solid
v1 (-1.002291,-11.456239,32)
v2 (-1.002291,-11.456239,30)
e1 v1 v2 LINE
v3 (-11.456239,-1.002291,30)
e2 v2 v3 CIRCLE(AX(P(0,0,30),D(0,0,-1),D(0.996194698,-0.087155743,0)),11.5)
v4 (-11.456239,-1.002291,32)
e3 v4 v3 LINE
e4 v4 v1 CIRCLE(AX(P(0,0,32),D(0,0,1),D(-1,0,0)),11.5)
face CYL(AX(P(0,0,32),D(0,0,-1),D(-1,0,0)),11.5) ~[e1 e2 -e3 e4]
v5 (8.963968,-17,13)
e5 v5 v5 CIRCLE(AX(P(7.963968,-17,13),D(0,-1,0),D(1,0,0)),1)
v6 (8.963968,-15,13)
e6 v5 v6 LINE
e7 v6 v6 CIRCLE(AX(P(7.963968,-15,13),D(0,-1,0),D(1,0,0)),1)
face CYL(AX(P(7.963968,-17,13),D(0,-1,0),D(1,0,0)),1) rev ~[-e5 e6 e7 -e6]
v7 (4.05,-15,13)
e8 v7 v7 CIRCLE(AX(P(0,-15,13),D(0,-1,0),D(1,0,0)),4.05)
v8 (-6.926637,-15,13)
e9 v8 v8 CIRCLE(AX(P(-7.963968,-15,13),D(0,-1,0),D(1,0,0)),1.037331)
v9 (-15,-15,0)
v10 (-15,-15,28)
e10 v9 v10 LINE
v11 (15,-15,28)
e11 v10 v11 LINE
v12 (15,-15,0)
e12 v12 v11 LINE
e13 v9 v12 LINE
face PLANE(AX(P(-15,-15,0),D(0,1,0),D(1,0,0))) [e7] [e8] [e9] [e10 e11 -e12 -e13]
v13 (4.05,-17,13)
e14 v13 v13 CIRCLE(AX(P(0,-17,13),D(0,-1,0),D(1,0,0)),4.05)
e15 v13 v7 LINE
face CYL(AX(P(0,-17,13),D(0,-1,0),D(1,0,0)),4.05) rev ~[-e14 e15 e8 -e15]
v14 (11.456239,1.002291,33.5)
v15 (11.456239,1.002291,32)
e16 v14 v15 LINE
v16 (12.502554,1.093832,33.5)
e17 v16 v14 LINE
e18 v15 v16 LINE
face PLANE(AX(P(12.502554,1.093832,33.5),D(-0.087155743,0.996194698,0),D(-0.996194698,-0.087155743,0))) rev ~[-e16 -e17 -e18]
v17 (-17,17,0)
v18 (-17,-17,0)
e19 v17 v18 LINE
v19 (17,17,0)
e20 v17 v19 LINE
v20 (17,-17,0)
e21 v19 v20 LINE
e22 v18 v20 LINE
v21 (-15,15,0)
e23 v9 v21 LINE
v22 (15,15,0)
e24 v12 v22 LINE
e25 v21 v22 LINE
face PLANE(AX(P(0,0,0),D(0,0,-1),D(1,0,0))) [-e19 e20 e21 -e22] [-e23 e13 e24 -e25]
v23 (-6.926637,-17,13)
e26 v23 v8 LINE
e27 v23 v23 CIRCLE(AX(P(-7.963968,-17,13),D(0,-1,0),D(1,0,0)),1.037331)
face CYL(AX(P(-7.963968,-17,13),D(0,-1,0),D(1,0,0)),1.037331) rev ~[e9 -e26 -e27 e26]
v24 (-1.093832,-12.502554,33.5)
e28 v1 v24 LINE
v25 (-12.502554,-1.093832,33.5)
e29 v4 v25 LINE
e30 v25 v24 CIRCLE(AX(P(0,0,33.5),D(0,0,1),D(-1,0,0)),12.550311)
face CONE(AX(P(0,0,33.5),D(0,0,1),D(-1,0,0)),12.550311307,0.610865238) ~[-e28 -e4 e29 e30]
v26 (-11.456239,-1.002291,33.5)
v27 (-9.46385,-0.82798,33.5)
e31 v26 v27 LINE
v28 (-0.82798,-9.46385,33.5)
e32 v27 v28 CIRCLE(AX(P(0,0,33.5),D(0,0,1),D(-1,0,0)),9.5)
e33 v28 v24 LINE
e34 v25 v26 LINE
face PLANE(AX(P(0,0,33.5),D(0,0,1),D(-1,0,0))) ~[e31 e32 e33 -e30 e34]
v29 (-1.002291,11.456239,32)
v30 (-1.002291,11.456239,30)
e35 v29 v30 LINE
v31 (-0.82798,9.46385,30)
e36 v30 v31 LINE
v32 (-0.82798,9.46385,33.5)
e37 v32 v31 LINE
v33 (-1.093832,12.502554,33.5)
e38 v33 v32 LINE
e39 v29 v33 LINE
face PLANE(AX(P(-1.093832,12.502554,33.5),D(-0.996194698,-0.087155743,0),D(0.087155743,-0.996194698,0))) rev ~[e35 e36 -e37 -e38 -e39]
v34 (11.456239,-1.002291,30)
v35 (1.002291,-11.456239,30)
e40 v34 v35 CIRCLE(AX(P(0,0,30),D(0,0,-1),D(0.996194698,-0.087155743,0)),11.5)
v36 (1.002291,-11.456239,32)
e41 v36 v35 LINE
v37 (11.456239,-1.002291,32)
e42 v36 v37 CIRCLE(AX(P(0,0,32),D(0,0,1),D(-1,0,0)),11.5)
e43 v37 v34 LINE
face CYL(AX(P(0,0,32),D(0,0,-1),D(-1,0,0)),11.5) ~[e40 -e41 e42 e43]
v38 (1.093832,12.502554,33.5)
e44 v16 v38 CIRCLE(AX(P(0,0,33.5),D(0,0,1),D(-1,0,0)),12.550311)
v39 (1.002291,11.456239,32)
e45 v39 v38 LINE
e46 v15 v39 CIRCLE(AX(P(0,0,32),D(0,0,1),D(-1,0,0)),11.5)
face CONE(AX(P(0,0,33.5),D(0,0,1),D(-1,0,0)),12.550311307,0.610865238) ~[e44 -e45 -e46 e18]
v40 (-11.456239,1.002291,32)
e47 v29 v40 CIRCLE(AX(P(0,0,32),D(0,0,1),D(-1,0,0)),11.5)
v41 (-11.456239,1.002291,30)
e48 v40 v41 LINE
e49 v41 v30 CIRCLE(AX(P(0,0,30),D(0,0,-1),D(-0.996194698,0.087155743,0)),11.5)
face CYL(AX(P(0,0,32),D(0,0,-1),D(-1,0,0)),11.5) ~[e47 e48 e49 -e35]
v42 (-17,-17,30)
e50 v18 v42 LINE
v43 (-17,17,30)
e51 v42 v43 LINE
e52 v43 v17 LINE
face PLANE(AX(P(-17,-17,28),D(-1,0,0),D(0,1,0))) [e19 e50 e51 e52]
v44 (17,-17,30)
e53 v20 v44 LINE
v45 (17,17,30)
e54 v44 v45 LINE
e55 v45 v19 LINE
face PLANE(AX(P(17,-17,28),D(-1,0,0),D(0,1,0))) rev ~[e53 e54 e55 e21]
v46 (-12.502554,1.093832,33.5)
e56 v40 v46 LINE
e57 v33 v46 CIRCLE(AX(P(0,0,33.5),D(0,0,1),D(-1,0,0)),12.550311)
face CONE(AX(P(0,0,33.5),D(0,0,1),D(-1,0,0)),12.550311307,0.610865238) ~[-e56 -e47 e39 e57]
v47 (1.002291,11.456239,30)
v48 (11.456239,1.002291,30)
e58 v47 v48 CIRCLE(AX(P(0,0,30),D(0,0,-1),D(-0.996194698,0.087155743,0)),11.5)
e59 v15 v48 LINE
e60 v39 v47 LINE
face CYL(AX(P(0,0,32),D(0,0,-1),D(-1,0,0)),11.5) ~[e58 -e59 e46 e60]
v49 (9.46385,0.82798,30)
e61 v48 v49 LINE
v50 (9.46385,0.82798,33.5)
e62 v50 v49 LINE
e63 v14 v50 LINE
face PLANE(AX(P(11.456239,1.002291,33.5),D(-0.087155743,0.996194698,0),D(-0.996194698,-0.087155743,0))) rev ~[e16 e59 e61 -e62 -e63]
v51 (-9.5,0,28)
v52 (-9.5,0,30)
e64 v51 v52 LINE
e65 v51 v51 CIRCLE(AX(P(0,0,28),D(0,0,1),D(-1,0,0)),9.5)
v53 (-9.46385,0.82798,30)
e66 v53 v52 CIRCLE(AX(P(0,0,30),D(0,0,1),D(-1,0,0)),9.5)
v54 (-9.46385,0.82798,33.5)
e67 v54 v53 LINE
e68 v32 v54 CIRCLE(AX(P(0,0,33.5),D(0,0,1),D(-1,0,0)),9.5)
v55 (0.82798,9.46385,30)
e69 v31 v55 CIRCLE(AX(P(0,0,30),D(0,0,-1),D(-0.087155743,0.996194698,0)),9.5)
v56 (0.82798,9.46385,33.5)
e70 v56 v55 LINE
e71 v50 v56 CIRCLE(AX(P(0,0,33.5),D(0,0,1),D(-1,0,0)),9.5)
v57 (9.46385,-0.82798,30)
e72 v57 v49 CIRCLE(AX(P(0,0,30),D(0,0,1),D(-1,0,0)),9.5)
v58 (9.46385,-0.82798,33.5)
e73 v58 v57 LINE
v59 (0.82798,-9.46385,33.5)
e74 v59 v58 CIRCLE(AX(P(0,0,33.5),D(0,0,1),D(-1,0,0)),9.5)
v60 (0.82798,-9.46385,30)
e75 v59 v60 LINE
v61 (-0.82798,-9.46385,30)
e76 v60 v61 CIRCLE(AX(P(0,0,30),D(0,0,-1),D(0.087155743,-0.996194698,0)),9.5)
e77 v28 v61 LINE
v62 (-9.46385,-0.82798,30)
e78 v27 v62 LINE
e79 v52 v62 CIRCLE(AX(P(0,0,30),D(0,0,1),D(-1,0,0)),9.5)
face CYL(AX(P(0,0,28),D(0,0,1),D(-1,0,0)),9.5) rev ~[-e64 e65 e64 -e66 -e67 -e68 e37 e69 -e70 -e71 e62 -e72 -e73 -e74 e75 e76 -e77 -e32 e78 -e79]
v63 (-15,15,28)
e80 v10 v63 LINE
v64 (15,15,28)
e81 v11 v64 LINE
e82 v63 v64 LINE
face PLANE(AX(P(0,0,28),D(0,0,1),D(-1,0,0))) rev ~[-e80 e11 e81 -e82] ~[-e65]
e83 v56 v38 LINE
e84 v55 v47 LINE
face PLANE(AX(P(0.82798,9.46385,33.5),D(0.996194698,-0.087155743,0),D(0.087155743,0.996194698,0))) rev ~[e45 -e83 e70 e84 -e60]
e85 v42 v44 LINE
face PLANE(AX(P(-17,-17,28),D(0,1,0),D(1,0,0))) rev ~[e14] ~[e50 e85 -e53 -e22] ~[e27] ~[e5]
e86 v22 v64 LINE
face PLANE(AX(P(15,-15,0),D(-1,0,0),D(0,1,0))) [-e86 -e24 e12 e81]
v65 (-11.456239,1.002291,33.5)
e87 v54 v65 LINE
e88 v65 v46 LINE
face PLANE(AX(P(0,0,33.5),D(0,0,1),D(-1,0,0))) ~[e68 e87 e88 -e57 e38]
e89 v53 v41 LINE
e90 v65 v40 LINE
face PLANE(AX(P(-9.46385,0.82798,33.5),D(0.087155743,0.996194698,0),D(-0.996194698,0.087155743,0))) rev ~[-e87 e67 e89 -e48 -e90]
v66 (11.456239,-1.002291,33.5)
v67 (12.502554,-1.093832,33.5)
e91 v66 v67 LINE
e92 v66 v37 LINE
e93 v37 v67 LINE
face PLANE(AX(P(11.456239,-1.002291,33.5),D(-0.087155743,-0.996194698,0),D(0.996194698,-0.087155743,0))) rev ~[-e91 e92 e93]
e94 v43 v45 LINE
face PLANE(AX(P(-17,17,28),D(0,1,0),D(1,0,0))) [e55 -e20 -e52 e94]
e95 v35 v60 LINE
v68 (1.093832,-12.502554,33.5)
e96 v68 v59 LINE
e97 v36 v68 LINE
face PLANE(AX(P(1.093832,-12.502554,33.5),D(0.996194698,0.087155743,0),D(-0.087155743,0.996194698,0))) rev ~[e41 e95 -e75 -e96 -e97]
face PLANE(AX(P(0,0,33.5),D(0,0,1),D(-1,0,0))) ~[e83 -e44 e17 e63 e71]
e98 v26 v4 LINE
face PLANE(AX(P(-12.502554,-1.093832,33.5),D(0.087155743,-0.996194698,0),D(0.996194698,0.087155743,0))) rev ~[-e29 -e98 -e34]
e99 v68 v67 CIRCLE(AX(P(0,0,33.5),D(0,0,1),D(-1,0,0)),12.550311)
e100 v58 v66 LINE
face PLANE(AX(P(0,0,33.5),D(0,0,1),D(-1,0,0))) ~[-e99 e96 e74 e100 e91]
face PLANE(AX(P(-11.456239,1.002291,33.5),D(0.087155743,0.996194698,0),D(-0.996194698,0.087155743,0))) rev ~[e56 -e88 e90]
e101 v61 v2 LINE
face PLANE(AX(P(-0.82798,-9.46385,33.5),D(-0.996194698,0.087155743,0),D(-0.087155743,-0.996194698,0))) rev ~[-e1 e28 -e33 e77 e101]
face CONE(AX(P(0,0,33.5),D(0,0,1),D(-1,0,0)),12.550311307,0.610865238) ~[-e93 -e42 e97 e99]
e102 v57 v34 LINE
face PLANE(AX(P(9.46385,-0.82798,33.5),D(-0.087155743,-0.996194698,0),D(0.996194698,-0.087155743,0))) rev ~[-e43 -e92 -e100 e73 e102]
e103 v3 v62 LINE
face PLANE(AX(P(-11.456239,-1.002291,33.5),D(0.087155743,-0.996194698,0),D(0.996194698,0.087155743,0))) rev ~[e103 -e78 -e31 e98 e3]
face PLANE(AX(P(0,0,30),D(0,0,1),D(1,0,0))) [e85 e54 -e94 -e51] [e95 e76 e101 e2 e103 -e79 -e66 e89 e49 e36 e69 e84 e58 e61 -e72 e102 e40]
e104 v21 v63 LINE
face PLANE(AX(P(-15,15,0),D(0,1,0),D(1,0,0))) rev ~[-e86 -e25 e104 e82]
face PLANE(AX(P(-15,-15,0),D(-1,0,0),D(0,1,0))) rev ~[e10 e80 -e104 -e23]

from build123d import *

# Parameters (mm, degrees)
F0_W      = 34
F0_H      = 34
F0_W_2    = 30
F0_H_2    = 30
F1_DEPTH  = 2
F2_DEPTH  = 28
F4_W      = 34
F4_H      = 34
F4_W_2    = 30
F4_H_2    = 30
F5_DEPTH  = 2
F9_DEPTH  = 3.5
F3_R      = 4.05
F3_R_2    = 1
F3_R_3    = 1.0373308001
F10_DEPTH = 2
F11_W     = 34
F11_H     = 34
F12_DEPTH = 2


with BuildPart() as f1:
    # F0 (on Top) → F1 (new body)
    with BuildSketch(Plane.XY):
        Rectangle(F0_W, F0_H)
        Rectangle(F0_W_2, F0_H_2, mode=Mode.SUBTRACT)
        Rectangle(F0_W_2, F0_H_2)
    extrude(amount=-F1_DEPTH)

    # F0 (on Top) → F2 (join)
    with BuildSketch(Plane.XY):
        Rectangle(F0_W, F0_H)
        Rectangle(F0_W_2, F0_H_2, mode=Mode.SUBTRACT)
    extrude(amount=F2_DEPTH)

    # F4 (on face) → F5 (join)
    with BuildSketch(Plane.XY.offset(28)):
        Rectangle(F4_W, F4_H)
        Rectangle(F4_W_2, F4_H_2, mode=Mode.SUBTRACT)
        Rectangle(F4_W_2, F4_H_2)
        with BuildLine():
            ThreePointArc((11.4562390281, 1.0022910416), (11.4890545482, 0.5016229547), (11.5, 0))
            ThreePointArc((11.5, 0), (11.4890545482, -0.5016229547), (11.4562390281, -1.0022910416))
            ThreePointArc((11.4562390281, -1.0022910416), (0, -11.5), (-11.4562390281, -1.0022910416))
            ThreePointArc((-11.4562390281, -1.0022910416), (-11.5, 0), (-11.4562390281, 1.0022910416))
            ThreePointArc((-11.4562390281, 1.0022910416), (0, 11.5), (11.4562390281, 1.0022910416))
        make_face(mode=Mode.SUBTRACT)
    extrude(amount=F5_DEPTH)

    # F6 (on Front) → F7 (revolve)
    with BuildSketch(Plane.XZ):
        Polygon((-11.5, 32), (-11.5, 30), (-9.5, 30), (-9.5, 33.5), (-12.5503113073, 33.5), align=None)
        Polygon((-9.5, 30), (-11.5, 30), (-11.5, 28), (-10.5, 28), (-9.5, 28), align=None)
    revolve(axis=Axis((0, 0, 27.9606003314), (0, 0, 1)))

    # F8 (on face) → F9 (cut)
    with BuildSketch(Plane.XY.offset(33.5)):
        with BuildLine():
            Line((9.4638496319, 0.8279795561), (0, 0))
            Line((0, 0), (9.4638496319, -0.8279795561))
            ThreePointArc((9.4638496319, -0.8279795561), (9.490958105, -0.41438418), (9.5, 0))
            ThreePointArc((9.5, 0), (9.490958105, 0.41438418), (9.4638496319, 0.8279795561))
        make_face()
        with BuildLine():
            Line((-9.4638496319, -0.8279795561), (0, 0))
            Line((0, 0), (-9.4638496319, 0.8279795561))
            ThreePointArc((-9.4638496319, 0.8279795561), (-9.5, 0), (-9.4638496319, -0.8279795561))
        make_face()
        with BuildLine():
            ThreePointArc((9.5, 0), (9.490958105, -0.41438418), (9.4638496319, -0.8279795561))
            Line((9.4638496319, -0.8279795561), (11.4562390281, -1.0022910416))
            Line((11.4562390281, -1.0022910416), (12.5025535837, -1.0938317037))
            ThreePointArc((12.5025535837, -1.0938317037), (12.5383661919, -0.5474368905), (12.5503113073, 0))
            ThreePointArc((12.5503113073, 0), (12.5383661919, 0.5474368905), (12.5025535837, 1.0938317037))
            Line((12.5025535837, 1.0938317037), (11.4562390281, 1.0022910416))
            Line((11.4562390281, 1.0022910416), (9.4638496319, 0.8279795561))
            ThreePointArc((9.4638496319, 0.8279795561), (9.490958105, 0.41438418), (9.5, 0))
        make_face()
        with BuildLine():
            Line((-11.4562390281, -1.0022910416), (-9.4638496319, -0.8279795561))
            ThreePointArc((-9.4638496319, -0.8279795561), (-9.5, 0), (-9.4638496319, 0.8279795561))
            Line((-9.4638496319, 0.8279795561), (-11.4562390281, 1.0022910416))
            Line((-11.4562390281, 1.0022910416), (-12.5025535837, 1.0938317037))
            ThreePointArc((-12.5025535837, 1.0938317037), (-12.5503113073, 0), (-12.5025535837, -1.0938317037))
            Line((-12.5025535837, -1.0938317037), (-11.4562390281, -1.0022910416))
        make_face()
        with BuildLine():
            Line((1.0938317037, -12.5025535837), (0.8279795561, -9.4638496319))
            ThreePointArc((0.8279795561, -9.4638496319), (0, -9.5), (-0.8279795561, -9.4638496319))
            Line((-0.8279795561, -9.4638496319), (-1.0938317037, -12.5025535837))
            ThreePointArc((-1.0938317037, -12.5025535837), (0, -12.5503113073), (1.0938317037, -12.5025535837))
        make_face()
        with BuildLine():
            Line((-1.0938317037, 12.5025535837), (-0.8279795561, 9.4638496319))
            ThreePointArc((-0.8279795561, 9.4638496319), (0, 9.5), (0.8279795561, 9.4638496319))
            Line((0.8279795561, 9.4638496319), (1.0938317037, 12.5025535837))
            ThreePointArc((1.0938317037, 12.5025535837), (0, 12.5503113073), (-1.0938317037, 12.5025535837))
        make_face()
    extrude(amount=-F9_DEPTH, mode=Mode.SUBTRACT)

    # F3 (on face) → F10 (cut, through all)
    with BuildSketch(Plane.XZ.offset(17)):
        with Locations((0, 13)):
            Circle(F3_R)
        with Locations((7.9639680702, 13)):
            Circle(F3_R_2)
        with Locations((-7.9639680702, 13)):
            Circle(F3_R_3)
    extrude(amount=-F10_DEPTH, mode=Mode.SUBTRACT)

    # F11 (on face) → F12 (cut)
    with BuildSketch(Plane(origin=(0, 0, -2), x_dir=(1, 0, 0), z_dir=(0, 0, -1))):
        Rectangle(F11_W, F11_H)
    extrude(amount=-F12_DEPTH, mode=Mode.SUBTRACT)


solid = f1.part
